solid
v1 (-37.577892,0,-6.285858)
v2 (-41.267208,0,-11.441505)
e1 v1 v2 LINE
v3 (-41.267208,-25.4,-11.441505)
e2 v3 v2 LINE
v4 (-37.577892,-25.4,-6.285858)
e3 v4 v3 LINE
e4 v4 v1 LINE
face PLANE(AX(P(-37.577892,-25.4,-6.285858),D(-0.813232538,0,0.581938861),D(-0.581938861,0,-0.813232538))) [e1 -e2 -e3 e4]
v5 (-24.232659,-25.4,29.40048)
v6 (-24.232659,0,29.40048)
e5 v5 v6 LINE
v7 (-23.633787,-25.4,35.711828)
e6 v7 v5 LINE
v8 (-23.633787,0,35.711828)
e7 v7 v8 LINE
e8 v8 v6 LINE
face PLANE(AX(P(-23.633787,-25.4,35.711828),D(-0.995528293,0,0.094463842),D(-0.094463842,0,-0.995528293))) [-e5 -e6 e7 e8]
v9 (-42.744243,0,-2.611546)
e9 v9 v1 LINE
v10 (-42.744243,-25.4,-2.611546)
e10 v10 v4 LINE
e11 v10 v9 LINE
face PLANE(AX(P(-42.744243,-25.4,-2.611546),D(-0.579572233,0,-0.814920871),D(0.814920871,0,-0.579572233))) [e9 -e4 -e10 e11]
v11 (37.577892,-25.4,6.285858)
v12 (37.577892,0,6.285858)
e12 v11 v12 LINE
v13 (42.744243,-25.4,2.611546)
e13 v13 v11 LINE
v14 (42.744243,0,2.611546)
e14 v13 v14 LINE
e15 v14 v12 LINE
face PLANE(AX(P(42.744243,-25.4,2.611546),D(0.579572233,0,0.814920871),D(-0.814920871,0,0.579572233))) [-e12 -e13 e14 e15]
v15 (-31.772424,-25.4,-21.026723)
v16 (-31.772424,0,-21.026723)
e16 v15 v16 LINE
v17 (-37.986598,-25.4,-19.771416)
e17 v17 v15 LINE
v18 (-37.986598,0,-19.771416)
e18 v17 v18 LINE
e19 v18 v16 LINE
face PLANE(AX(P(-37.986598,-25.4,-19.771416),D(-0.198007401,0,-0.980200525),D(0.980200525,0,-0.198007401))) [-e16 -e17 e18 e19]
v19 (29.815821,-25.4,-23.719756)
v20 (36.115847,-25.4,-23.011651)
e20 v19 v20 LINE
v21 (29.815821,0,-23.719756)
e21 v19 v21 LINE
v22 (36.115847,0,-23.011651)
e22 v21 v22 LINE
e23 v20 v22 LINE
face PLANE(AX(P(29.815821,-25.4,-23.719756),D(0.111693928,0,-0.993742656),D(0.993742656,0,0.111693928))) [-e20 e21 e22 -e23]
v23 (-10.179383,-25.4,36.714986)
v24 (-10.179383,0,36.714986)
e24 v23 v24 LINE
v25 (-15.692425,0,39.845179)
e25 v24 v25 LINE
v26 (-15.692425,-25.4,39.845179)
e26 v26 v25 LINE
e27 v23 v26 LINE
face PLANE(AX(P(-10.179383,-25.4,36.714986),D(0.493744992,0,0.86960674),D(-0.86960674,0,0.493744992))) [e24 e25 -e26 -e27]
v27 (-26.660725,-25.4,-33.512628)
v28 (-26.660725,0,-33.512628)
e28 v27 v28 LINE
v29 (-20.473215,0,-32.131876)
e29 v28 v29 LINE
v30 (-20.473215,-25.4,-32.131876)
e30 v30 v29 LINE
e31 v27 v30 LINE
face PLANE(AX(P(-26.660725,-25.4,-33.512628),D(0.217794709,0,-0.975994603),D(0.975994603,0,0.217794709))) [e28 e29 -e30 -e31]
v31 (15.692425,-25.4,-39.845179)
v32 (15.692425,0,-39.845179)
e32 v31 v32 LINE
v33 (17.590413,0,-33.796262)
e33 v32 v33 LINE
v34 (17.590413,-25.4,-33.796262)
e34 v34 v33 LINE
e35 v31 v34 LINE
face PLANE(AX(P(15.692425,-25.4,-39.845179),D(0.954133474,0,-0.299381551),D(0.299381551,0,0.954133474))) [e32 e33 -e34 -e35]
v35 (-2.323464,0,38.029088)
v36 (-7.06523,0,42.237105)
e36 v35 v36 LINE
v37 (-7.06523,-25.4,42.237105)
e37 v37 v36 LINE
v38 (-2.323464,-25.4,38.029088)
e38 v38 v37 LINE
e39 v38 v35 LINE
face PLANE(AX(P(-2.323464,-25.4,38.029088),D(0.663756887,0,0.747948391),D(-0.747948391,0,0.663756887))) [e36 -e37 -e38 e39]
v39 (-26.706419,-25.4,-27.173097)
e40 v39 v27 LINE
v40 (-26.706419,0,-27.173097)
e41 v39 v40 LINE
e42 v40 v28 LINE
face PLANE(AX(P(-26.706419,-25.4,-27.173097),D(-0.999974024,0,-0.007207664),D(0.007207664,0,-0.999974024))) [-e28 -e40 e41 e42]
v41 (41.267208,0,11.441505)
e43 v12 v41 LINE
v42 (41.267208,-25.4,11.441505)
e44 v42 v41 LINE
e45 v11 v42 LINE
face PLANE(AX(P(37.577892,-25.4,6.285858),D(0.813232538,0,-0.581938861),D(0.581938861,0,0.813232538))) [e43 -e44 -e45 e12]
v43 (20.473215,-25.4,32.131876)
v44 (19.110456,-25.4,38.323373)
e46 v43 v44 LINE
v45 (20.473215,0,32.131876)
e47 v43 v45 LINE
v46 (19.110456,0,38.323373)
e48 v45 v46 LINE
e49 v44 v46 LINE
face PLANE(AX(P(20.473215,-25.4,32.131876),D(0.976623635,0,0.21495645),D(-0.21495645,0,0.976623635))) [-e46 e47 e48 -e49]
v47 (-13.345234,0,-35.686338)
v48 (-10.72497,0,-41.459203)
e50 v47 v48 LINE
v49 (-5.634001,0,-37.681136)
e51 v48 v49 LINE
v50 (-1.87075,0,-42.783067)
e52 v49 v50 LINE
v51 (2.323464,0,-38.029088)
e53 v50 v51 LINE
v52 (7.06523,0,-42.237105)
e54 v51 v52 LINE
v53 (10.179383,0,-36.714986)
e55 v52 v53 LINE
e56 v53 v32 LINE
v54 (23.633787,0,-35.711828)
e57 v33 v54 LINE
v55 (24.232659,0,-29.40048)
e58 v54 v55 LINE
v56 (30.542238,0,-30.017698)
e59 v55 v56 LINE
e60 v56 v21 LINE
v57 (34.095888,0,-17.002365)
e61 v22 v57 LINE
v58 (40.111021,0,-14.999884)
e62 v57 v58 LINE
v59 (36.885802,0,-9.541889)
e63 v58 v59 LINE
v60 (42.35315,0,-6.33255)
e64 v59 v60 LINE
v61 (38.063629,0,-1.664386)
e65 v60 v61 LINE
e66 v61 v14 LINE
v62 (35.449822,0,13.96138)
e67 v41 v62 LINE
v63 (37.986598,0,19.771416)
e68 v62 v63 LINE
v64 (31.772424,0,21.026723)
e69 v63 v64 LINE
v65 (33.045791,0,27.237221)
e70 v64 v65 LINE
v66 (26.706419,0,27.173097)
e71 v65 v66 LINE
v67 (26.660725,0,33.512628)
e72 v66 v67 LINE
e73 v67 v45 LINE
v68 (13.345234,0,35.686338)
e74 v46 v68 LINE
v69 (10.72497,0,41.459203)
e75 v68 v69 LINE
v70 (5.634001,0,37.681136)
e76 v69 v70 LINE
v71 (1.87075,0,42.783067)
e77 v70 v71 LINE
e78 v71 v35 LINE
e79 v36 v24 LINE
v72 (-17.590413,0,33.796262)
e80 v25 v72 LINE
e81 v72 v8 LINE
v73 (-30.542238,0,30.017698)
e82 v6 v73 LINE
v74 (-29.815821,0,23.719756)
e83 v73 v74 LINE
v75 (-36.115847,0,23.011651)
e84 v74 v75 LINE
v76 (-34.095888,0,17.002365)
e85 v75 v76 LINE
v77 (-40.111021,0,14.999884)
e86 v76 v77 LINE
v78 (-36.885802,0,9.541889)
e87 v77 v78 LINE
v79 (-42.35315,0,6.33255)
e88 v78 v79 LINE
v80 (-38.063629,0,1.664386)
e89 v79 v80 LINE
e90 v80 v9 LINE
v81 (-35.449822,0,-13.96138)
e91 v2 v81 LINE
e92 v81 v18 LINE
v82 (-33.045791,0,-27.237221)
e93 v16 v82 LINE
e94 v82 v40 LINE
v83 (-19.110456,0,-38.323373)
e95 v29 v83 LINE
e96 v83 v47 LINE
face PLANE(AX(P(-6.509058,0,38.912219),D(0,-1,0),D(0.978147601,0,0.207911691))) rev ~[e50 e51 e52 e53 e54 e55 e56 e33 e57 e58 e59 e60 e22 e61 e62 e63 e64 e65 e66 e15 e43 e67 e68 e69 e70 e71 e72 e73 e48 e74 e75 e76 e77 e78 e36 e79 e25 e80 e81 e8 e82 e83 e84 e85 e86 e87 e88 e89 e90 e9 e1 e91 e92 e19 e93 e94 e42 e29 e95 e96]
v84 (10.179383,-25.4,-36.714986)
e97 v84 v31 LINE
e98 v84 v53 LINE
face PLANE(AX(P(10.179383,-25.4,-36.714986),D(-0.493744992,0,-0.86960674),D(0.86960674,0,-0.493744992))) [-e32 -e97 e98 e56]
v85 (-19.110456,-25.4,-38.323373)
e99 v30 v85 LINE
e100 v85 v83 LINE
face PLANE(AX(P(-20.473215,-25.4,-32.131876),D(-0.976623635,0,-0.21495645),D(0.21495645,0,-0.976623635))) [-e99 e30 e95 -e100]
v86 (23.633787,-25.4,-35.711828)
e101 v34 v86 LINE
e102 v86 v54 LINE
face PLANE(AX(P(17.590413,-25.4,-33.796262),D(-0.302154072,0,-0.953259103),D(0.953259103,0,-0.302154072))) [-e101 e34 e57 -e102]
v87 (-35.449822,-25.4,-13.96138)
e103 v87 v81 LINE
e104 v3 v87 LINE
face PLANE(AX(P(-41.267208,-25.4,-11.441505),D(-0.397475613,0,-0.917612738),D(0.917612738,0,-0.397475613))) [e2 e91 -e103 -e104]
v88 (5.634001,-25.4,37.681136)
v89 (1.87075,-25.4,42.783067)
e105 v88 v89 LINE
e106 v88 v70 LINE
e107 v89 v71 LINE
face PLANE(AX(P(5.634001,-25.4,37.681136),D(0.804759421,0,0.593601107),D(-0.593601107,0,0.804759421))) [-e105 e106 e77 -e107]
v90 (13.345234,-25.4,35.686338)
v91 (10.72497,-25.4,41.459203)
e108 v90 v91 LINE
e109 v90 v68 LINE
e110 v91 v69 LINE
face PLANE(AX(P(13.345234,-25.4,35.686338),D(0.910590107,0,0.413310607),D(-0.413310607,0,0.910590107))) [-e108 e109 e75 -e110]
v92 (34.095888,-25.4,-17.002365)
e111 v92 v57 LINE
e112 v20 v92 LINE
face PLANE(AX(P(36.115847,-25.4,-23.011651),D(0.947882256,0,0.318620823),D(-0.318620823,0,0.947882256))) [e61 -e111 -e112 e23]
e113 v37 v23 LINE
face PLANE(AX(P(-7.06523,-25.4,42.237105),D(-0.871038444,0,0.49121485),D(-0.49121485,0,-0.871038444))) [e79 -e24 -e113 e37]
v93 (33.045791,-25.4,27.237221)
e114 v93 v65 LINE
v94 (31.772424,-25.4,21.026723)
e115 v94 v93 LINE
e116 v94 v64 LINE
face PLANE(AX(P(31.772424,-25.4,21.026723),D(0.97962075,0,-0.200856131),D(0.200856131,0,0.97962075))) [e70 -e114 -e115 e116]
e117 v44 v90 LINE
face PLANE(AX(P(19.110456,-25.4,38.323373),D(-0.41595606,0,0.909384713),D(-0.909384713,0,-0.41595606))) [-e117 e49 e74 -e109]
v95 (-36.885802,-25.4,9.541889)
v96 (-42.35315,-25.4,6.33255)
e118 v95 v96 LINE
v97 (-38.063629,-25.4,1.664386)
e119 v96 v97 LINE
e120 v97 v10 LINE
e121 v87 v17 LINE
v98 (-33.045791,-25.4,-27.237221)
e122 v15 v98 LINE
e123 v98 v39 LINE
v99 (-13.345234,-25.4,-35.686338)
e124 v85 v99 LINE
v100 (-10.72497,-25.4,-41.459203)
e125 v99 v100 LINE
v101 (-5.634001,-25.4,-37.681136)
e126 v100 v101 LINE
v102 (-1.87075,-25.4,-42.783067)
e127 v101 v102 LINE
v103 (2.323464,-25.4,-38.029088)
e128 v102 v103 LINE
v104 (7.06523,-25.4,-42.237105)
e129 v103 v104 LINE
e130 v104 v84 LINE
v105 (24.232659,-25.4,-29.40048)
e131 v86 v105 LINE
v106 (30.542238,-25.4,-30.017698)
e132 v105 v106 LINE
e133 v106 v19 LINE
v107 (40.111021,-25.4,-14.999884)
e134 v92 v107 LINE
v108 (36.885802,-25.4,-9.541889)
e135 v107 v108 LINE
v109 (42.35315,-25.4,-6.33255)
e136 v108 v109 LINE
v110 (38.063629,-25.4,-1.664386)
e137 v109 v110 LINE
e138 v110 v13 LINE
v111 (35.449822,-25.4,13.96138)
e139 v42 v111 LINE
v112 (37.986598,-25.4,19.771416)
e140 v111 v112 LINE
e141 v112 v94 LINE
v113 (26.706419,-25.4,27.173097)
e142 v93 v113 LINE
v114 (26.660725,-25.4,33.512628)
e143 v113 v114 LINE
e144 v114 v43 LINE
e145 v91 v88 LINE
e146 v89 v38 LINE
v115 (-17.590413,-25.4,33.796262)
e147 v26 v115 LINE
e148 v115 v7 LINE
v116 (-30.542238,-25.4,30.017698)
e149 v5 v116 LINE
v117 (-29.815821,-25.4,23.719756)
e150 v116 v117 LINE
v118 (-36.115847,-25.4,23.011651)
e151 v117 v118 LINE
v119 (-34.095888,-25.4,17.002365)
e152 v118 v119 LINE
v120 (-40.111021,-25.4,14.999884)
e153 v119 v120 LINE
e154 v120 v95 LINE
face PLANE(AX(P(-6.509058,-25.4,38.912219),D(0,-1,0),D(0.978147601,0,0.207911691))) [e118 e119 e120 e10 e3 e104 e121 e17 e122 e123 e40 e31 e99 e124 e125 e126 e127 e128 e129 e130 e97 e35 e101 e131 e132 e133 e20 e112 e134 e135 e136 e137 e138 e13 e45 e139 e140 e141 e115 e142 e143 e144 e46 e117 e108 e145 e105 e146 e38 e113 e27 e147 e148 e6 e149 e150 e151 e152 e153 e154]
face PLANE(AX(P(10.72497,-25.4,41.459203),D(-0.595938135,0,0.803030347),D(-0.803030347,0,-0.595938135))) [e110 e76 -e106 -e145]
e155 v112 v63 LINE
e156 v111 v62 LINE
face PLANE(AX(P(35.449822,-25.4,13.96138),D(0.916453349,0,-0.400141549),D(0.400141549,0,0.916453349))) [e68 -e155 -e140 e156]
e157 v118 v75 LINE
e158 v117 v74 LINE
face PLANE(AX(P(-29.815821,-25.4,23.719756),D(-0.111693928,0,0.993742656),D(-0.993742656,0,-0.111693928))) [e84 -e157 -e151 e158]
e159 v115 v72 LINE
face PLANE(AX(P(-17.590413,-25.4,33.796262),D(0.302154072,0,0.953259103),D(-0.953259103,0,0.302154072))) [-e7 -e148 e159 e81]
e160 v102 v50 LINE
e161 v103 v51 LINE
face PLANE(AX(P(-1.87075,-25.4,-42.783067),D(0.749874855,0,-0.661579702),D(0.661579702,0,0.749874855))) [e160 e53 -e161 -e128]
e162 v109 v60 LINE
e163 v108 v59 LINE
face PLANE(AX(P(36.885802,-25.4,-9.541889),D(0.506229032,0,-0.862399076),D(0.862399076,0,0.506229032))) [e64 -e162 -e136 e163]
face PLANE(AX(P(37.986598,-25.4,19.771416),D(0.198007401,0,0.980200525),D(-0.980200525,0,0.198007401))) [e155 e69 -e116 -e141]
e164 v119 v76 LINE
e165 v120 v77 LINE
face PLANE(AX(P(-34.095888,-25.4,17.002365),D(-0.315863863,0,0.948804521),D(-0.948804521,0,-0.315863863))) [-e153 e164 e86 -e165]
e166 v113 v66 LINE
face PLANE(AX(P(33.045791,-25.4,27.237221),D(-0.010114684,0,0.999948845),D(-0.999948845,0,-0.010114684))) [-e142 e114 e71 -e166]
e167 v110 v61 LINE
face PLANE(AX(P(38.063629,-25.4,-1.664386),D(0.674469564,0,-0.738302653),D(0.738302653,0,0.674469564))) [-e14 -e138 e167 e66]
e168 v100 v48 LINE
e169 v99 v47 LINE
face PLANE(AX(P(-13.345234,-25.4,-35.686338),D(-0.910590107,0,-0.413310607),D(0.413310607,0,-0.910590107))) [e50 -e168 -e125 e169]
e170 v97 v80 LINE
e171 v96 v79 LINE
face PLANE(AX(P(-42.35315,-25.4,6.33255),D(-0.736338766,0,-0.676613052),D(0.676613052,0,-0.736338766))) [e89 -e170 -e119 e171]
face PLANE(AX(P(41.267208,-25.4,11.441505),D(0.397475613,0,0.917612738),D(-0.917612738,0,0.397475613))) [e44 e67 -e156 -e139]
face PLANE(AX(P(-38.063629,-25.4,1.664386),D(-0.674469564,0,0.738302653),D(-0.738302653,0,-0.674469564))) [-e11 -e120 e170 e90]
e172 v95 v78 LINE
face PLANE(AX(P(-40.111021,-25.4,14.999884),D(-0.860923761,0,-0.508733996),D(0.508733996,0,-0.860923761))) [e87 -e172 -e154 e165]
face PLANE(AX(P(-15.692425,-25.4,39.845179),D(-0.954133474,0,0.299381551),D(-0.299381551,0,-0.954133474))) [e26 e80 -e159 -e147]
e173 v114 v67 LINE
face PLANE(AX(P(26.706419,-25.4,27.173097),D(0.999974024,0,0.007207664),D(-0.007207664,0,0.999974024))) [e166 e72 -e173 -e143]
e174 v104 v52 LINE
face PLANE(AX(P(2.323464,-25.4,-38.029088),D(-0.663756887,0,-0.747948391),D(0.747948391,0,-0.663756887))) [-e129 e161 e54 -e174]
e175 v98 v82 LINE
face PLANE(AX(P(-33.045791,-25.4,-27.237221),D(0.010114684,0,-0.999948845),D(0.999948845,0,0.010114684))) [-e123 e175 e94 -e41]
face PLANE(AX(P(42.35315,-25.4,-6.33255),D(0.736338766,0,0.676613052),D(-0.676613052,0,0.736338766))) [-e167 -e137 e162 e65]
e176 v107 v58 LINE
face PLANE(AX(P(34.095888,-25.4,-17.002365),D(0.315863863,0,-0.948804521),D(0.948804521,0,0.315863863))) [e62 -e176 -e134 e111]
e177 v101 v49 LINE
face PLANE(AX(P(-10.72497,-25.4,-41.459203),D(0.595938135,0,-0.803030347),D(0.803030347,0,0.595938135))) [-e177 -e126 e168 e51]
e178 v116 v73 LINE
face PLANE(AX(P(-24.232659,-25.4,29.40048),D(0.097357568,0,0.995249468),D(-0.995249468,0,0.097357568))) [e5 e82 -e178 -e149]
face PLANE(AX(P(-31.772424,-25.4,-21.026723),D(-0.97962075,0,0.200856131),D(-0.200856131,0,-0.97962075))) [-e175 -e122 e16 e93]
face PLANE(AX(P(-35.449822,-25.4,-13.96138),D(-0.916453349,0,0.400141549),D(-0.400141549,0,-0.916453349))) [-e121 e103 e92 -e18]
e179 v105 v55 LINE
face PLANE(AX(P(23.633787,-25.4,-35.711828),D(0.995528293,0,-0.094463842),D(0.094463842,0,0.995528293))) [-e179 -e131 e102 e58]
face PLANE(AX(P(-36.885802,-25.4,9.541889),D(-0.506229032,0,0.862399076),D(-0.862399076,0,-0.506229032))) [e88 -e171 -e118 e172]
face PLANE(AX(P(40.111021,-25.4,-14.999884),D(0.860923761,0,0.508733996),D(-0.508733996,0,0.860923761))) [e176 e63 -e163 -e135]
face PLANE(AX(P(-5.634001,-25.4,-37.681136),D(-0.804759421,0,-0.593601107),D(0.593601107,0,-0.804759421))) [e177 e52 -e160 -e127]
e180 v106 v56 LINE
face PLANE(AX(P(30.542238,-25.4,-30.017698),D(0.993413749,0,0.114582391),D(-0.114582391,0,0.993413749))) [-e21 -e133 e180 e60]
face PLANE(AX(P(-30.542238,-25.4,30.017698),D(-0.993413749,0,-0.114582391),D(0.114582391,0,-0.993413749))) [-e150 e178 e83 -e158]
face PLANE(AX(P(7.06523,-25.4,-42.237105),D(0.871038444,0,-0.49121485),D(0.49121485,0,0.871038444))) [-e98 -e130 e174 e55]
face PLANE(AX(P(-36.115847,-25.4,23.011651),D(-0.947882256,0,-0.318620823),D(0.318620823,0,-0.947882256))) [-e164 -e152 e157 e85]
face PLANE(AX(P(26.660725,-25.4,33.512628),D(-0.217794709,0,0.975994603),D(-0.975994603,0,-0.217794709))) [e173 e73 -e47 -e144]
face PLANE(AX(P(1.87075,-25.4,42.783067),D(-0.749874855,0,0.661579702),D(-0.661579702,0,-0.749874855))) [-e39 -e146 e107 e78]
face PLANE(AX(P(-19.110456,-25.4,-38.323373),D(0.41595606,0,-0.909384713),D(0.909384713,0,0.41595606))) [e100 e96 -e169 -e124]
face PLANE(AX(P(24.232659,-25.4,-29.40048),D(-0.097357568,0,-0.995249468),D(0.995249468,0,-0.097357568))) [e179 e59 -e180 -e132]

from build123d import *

# Parameters (mm, degrees)
F0_R            = 38.1
F1_DEPTH        = 25.4
F3_DEPTH        = 25.4
F3_COPIES_COUNT = 30


# Not quite as in the source:
# - a pattern or mirror of a feature is missing from the dataset's text; its kind, count and spacing are read off the source's solid


with BuildPart() as f1:
    # F0 (on Front) → F1 (new body)
    with BuildSketch(Plane.XZ):
        Circle(F0_R)
    extrude(amount=F1_DEPTH)

    # F2 (on face) → F3 (join)
    with BuildSketch(Plane.XZ.offset(25.4)):
        with BuildLine():
            Line((1.8707504496, 42.7830666304), (-2.323463975, 38.0290877508))
            ThreePointArc((-2.323463975, 38.0290877508), (1.6643863058, 38.0636285478), (5.6340012219, 37.6811362651))
            Line((5.6340012219, 37.6811362651), (1.8707504496, 42.7830666304))
        make_face()
    f3 = extrude(amount=-F3_DEPTH)

    # F3_copies: F3 ×30 about axis
    f3_copies_axis = Axis((0, 0, 0), (0, 1, 0))
    for i in range(1, F3_COPIES_COUNT):
        add(f3.rotate(f3_copies_axis, i * 360 / F3_COPIES_COUNT))


solid = f1.part
